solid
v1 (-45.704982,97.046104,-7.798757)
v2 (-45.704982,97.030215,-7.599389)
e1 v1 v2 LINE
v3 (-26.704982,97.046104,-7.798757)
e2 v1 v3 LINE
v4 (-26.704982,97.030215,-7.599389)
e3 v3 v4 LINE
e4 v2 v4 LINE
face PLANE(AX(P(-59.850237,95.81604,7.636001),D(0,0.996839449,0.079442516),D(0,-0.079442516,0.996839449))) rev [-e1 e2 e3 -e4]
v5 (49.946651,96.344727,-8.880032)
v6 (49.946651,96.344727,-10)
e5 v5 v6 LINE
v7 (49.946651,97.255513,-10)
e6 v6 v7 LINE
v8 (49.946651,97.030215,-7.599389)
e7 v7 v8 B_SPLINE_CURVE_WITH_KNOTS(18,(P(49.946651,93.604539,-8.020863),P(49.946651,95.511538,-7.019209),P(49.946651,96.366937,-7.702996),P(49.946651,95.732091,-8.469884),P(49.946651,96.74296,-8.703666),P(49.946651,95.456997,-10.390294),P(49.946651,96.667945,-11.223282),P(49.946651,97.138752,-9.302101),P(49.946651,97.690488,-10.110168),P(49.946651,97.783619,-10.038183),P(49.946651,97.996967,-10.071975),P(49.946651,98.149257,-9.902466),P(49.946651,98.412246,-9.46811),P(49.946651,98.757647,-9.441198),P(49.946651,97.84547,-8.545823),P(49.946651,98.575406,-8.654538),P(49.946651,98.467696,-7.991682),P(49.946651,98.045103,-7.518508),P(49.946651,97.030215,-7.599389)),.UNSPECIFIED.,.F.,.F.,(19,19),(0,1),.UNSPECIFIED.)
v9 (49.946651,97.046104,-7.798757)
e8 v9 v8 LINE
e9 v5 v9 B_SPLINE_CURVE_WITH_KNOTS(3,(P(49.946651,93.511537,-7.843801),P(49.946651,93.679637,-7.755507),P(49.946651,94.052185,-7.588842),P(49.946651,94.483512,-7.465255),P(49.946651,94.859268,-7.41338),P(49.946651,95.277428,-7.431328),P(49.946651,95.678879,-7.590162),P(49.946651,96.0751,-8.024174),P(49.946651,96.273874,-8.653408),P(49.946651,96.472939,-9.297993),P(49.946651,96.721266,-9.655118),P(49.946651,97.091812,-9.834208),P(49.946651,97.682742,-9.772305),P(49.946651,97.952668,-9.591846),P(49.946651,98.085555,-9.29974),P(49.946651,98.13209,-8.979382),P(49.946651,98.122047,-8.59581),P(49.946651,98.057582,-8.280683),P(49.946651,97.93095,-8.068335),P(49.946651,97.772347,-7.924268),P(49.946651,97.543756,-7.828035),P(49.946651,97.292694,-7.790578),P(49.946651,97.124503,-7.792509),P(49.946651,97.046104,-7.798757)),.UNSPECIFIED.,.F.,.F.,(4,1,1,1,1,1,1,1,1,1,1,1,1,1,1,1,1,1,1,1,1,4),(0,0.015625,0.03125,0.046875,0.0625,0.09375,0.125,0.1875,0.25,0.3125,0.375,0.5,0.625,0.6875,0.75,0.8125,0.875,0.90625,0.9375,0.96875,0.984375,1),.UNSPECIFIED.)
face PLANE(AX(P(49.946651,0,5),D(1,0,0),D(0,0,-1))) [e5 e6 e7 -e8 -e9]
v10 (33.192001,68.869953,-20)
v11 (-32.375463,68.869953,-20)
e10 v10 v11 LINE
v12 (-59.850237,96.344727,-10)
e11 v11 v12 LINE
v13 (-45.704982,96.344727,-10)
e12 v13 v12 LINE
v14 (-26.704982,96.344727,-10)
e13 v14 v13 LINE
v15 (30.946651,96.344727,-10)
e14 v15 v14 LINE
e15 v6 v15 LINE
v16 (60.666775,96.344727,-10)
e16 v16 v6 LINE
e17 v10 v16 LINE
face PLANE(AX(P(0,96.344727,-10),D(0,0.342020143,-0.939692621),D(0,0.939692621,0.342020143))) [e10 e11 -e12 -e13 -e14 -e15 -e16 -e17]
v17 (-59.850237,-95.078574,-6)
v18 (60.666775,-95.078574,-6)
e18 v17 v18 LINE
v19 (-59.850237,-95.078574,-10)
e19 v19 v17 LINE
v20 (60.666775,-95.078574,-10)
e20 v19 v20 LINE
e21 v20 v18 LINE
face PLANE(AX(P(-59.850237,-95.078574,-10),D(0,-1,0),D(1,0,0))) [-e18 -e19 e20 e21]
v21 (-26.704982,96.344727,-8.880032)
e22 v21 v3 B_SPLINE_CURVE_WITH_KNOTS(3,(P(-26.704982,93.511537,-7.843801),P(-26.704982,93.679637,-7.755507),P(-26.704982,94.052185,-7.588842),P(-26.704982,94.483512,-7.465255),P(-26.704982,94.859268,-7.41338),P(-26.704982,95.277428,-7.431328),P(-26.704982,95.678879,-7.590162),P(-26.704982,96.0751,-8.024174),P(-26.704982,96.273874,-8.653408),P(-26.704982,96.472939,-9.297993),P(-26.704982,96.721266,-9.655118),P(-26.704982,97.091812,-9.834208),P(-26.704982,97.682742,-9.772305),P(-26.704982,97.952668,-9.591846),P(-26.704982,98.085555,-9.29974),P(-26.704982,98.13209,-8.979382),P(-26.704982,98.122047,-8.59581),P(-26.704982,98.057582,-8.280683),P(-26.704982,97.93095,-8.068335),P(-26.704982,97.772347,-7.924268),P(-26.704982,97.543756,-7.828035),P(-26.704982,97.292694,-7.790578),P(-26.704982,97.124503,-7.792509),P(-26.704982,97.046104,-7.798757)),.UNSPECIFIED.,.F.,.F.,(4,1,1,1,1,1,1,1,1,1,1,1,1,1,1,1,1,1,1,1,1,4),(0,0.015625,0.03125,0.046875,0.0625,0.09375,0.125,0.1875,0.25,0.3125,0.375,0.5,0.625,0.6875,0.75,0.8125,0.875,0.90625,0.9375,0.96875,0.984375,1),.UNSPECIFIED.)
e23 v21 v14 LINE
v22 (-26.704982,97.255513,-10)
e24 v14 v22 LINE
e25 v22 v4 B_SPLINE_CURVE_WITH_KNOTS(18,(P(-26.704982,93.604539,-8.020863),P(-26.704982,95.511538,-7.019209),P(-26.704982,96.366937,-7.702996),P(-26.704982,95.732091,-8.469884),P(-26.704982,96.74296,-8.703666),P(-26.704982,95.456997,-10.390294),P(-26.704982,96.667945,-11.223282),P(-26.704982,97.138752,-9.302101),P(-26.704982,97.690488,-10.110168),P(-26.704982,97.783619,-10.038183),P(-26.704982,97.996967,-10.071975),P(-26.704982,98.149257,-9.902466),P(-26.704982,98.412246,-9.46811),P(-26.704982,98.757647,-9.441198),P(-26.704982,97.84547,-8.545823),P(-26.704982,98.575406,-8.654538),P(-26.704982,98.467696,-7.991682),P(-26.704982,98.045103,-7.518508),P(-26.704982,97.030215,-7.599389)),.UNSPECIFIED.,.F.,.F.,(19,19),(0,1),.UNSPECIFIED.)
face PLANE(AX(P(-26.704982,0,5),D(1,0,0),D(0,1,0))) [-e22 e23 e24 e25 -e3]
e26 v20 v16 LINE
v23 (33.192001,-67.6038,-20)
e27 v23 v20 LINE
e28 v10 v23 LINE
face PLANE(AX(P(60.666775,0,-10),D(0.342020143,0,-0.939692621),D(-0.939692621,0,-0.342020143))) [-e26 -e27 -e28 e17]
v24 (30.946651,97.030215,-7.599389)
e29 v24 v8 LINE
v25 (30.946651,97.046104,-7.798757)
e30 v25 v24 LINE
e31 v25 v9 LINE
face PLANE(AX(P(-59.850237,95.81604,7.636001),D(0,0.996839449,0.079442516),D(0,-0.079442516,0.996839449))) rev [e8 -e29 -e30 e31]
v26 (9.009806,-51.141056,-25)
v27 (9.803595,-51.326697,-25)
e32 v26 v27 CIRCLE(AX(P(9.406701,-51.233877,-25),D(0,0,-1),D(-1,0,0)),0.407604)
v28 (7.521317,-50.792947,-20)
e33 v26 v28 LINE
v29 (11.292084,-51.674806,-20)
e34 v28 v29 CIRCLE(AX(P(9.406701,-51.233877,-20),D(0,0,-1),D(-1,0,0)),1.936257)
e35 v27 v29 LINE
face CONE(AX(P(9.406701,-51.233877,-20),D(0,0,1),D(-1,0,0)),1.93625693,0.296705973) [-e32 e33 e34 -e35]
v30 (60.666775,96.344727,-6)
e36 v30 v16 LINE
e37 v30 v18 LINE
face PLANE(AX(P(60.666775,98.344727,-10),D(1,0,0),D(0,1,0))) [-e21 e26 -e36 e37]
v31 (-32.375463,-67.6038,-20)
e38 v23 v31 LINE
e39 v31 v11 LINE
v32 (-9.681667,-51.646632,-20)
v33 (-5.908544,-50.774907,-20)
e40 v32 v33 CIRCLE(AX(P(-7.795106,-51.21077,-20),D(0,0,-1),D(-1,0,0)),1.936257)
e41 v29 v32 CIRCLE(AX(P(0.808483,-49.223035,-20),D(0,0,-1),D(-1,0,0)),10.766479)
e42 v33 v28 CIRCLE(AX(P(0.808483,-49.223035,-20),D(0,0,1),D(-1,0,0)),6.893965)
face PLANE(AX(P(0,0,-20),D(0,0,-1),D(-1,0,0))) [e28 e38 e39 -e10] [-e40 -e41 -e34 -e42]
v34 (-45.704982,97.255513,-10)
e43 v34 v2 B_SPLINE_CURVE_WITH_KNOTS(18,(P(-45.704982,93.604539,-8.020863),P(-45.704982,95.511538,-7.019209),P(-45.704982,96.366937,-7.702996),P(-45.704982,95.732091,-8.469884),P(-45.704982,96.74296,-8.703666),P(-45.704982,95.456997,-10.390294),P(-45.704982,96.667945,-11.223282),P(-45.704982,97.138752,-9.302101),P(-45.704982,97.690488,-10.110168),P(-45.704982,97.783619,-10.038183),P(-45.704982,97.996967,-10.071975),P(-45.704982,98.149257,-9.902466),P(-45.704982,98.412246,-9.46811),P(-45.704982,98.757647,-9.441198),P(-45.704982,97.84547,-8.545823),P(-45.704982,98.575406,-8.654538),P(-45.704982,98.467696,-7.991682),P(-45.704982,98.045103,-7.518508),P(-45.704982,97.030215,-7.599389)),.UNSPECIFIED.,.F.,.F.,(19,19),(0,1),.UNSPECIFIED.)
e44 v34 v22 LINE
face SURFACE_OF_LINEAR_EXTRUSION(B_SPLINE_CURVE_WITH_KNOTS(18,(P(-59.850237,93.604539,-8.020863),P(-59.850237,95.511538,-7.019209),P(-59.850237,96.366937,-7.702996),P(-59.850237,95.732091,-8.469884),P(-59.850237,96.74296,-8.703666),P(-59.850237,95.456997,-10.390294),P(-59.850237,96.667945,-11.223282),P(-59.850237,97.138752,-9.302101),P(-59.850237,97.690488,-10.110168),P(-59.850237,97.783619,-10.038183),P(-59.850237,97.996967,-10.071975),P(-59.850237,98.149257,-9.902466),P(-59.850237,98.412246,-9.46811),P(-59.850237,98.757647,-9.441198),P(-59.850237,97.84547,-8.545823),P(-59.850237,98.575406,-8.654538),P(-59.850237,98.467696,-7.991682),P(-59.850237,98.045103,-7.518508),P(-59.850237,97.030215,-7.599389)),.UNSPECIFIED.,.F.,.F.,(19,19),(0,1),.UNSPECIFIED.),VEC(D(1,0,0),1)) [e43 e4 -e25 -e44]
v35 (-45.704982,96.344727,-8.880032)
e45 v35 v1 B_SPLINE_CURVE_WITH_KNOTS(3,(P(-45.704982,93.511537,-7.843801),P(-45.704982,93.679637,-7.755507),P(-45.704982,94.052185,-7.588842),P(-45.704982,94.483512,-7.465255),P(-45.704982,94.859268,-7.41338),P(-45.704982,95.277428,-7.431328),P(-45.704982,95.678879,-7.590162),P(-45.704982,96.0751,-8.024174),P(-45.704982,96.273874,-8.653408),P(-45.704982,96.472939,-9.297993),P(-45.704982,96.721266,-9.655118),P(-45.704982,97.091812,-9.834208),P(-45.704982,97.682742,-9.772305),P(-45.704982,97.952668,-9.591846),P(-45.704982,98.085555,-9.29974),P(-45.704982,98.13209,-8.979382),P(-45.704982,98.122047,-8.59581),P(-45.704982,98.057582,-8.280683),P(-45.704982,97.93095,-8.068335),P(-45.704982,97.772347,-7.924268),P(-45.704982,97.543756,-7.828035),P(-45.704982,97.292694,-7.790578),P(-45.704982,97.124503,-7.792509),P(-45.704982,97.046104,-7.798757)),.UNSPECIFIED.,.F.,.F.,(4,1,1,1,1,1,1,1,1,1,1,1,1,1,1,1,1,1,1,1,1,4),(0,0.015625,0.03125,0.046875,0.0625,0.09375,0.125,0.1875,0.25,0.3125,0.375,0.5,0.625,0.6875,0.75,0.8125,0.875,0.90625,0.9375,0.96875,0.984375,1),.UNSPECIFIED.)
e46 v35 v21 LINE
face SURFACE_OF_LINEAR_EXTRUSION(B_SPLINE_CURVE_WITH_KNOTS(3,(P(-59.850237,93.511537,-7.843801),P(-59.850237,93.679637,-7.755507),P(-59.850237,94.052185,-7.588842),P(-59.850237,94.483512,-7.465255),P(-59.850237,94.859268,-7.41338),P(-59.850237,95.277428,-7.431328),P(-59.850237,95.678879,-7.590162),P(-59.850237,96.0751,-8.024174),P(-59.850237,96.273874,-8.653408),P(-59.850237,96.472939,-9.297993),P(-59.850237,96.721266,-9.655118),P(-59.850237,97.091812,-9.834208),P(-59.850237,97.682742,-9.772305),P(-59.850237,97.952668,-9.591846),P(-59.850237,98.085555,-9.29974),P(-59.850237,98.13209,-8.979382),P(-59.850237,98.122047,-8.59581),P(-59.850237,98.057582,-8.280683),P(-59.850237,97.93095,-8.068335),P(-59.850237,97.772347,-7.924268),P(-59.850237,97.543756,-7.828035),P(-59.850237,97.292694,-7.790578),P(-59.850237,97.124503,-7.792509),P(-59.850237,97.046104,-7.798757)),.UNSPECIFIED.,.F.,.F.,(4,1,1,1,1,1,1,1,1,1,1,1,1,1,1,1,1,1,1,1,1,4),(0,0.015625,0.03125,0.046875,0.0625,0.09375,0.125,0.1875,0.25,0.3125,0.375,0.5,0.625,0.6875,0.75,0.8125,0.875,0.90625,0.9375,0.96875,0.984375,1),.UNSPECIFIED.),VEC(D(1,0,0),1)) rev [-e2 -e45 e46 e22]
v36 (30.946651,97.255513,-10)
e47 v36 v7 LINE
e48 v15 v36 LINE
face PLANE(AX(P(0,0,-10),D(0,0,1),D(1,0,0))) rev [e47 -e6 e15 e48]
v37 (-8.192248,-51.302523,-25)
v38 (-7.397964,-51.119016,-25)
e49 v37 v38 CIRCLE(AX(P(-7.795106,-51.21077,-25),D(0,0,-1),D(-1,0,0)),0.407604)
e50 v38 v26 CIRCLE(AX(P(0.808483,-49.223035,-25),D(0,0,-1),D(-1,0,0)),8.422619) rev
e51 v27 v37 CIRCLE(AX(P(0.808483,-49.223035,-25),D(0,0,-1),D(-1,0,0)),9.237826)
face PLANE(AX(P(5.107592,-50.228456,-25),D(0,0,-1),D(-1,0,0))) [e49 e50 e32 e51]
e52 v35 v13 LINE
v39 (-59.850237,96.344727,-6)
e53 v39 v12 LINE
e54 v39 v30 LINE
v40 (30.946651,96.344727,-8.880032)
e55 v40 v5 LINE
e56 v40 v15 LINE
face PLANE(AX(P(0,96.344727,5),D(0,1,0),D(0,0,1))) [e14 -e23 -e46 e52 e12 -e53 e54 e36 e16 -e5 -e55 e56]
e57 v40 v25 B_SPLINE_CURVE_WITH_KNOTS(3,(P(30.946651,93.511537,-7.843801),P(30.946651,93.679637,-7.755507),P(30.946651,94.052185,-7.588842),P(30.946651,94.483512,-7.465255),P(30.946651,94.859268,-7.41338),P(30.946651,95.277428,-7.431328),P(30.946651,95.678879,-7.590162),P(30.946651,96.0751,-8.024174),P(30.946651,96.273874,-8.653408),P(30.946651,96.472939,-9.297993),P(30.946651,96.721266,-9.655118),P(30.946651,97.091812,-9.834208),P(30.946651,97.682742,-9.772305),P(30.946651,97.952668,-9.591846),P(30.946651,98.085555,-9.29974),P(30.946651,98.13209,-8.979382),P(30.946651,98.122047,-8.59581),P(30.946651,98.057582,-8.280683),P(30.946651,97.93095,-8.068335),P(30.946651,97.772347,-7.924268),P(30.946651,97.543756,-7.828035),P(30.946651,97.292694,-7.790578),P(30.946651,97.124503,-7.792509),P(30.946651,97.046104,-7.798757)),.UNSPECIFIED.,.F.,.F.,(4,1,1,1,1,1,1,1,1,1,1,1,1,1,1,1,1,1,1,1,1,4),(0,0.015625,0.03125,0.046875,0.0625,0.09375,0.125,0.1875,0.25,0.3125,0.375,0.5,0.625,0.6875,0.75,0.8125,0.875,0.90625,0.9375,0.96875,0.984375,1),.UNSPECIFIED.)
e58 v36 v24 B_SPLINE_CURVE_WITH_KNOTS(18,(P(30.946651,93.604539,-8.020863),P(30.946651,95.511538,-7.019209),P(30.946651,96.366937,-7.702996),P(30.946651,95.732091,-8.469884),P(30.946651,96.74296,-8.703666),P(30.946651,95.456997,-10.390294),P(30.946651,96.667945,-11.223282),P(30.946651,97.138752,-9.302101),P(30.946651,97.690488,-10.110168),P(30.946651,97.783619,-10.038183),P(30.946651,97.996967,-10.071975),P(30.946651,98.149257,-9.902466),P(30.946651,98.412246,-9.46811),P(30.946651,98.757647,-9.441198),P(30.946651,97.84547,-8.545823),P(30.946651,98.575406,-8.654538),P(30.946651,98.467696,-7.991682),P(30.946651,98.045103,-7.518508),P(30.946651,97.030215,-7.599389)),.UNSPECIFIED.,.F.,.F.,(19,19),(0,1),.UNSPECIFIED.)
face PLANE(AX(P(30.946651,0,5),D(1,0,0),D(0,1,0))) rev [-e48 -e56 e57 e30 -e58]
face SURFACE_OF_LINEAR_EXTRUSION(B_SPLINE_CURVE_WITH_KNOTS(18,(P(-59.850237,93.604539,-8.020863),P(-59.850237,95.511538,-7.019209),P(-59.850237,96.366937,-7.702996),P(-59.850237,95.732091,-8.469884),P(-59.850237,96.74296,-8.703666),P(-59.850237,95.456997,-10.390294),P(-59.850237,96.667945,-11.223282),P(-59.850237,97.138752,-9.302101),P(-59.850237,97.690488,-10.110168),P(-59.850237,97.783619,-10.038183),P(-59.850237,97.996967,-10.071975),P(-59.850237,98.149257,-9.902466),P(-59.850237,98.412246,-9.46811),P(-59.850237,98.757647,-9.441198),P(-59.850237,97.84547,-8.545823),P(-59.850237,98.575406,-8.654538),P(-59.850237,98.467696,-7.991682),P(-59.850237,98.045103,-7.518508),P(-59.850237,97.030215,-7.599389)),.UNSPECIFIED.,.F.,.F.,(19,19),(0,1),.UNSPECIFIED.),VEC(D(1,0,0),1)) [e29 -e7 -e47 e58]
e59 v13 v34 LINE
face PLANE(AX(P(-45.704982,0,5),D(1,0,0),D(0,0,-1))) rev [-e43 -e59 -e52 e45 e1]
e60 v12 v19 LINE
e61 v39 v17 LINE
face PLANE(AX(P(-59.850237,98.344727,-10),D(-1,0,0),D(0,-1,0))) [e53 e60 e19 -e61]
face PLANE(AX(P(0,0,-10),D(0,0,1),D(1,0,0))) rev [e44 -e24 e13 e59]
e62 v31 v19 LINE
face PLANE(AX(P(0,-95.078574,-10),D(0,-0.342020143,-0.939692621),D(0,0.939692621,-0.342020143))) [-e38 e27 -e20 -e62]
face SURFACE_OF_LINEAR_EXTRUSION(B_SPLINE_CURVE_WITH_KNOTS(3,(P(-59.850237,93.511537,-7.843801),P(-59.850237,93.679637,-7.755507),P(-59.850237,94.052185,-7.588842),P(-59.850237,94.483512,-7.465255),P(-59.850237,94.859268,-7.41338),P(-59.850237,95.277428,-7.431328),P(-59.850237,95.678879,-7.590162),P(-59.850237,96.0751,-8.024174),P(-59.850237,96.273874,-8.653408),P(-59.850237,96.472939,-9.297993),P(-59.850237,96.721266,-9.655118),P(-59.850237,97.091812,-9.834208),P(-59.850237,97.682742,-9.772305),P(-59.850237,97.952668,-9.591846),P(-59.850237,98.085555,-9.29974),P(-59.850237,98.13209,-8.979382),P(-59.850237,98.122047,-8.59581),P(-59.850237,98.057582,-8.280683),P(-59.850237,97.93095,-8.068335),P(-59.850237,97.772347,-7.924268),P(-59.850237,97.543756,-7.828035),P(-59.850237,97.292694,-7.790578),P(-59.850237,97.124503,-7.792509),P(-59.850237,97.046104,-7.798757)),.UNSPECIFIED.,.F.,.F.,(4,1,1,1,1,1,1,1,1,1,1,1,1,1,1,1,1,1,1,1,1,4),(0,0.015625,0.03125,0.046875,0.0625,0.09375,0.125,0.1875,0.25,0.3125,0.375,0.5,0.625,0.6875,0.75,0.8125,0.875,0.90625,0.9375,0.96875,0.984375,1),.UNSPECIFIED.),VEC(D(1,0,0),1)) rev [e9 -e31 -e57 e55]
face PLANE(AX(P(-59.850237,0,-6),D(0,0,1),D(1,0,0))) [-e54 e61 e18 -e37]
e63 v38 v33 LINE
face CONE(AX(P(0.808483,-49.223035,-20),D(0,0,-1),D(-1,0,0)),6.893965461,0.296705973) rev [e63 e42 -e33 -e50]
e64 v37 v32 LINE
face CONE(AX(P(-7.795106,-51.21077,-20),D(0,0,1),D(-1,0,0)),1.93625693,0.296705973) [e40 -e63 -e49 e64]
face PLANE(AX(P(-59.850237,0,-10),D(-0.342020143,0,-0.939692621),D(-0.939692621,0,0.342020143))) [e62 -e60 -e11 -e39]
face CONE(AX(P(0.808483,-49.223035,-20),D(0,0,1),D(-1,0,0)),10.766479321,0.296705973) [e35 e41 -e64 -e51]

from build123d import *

# Parameters (mm, degrees)
BOSS_EXTRUDE2_DEPTH      = 5
BOSS_EXTRUDE2_DEPTH_BACK = 10
SKETCH1_W                = 120.517011816
SKETCH1_H                = 193.423301164
CUT_EXTRUDE1_DEPTH       = 117.520998071
CUT_EXTRUDE1_DEPTH_BACK  = 117.520998071
SKETCH2_W                = 10.720124134
SKETCH2_H                = 2
SKETCH2_W_2              = 57.651632978
SKETCH2_W_3              = 14.145254704
CUT_EXTRUDE2_START       = -95.651632978
CUT_EXTRUDE2_DEPTH       = 95.651632978
CUT_EXTRUDE4_DEPTH       = 156.859658163
CUT_EXTRUDE4_DEPTH_BACK  = 156.859658163
SKETCH5_W                = 11
SKETCH5_H                = 191.423301164
BOSS_EXTRUDE3_DEPTH      = 10
BOSS_EXTRUDE3_DRAFT      = 70
BOSS_EXTRUDE4_DEPTH      = 5
BOSS_EXTRUDE4_TAPER      = 17


# Read off the part's stored shape, not the designer's step: Cut-Extrude2
with BuildPart() as part:
    # Sketch1 → Boss-Extrude2 (new, two sides: drawn at the far end of the back side and taken through both)
    with BuildSketch(Plane.XY.offset(-BOSS_EXTRUDE2_DEPTH_BACK)):
        with Locations((0.408269184, 1.633076737)):
            Rectangle(SKETCH1_W, SKETCH1_H)
    extrude(amount=BOSS_EXTRUDE2_DEPTH + BOSS_EXTRUDE2_DEPTH_BACK)

    # Sketch2 → Cut-Extrude1 (cut, two sides: drawn at the far end of the back side and taken through both)
    with BuildSketch(Plane(origin=(0, 0, -10), x_dir=(-1, 0, 0), z_dir=(0, 0, -1)).offset(-CUT_EXTRUDE1_DEPTH_BACK)):
        with Locations((-55.306713025, 97.344727319)):
            Rectangle(SKETCH2_W, SKETCH2_H)
        with Locations((-2.120834469, 97.344727319)):
            Rectangle(SKETCH2_W_2, SKETCH2_H)
        with Locations((52.777609372, 97.344727319)):
            Rectangle(SKETCH2_W_3, SKETCH2_H)
    extrude(amount=CUT_EXTRUDE1_DEPTH + CUT_EXTRUDE1_DEPTH_BACK, mode=Mode.SUBTRACT)

    # Cut-Extrude2 outline → Cut-Extrude2 (cut)
    with BuildSketch(Plane(origin=(49.946650958, 0, 0), x_dir=(0, 0, -1), z_dir=(1, 0, 0)).offset(CUT_EXTRUDE2_START)):
        with BuildLine():
            Line((-5, 96.344727319), (8.880031812, 96.344727322))
            add(Edge.make_bspline(
                [(8.880031812, 96.344727322), (9.017757925, 96.389418818), (9.341148133, 96.502947325), (9.65511797, 96.721266154), (9.834207861, 97.091812499), (9.772304841, 97.682742311), (9.591846004, 97.952667933), (9.299739635, 98.085555426), (8.979382301, 98.13209035), (8.595809552, 98.122046866), (8.280683269, 98.057581679), (8.068335475, 97.930949515), (7.924267823, 97.772346881), (7.828035074, 97.54375556), (7.790578102, 97.292694013), (7.792508646, 97.124503178), (7.79875666, 97.046103501)],
                knots=[0.210157703, 0.210157703, 0.210157703, 0.210157703, 0.25, 0.3125, 0.375, 0.5, 0.625, 0.6875, 0.75, 0.8125, 0.875, 0.90625, 0.9375, 0.96875, 0.984375, 1, 1, 1, 1], degree=3))
            Line((7.79875666, 97.046103501), (7.599388771, 97.030214998))
            add(Edge.make_bspline(
                [(10, 97.255513039), (9.999998961, 97.447527895), (9.972419046, 97.629851143), (9.927722494, 97.794553197), (9.870710413, 97.937325839), (9.798783484, 98.058137149), (9.704435395, 98.159491912), (9.580897677, 98.243174202), (9.426924325, 98.307669655), (9.246866395, 98.348516931), (9.047009529, 98.36212633), (8.833423752, 98.351560976), (8.612813999, 98.330782958), (8.391619774, 98.318858897), (8.17208277, 98.31353746), (7.941741695, 98.247701653), (7.690138593, 98.003146143), (7.552784018, 97.615008356), (7.599388771, 97.030214998)],
                knots=[0.42378525, 0.42378525, 0.42378525, 0.42378525, 0.42378525, 0.42378525, 0.42378525, 0.42378525, 0.42378525, 0.42378525, 0.42378525, 0.42378525, 0.42378525, 0.42378525, 0.42378525, 0.42378525, 0.42378525, 0.42378525, 0.42378525, 1, 1, 1, 1, 1, 1, 1, 1, 1, 1, 1, 1, 1, 1, 1, 1, 1, 1, 1], degree=18))
            Line((10, 97.255513039), (10, 98.344727319))
            Line((10, 98.344727319), (-5, 98.344727319))
            Line((-5, 98.344727319), (-5, 96.344727319))
        make_face()
    extrude(amount=CUT_EXTRUDE2_DEPTH, mode=Mode.SUBTRACT)

    # Sketch5 → Cut-Extrude4 (cut, two sides: drawn at the far end of the back side and taken through both)
    with BuildSketch(Plane(origin=(60.666775092, 0, 0), x_dir=(0, 0, -1), z_dir=(1, 0, 0)).offset(-CUT_EXTRUDE4_DEPTH_BACK)):
        with Locations((0.5, 0.633076737)):
            Rectangle(SKETCH5_W, SKETCH5_H)
    extrude(amount=CUT_EXTRUDE4_DEPTH + CUT_EXTRUDE4_DEPTH_BACK, mode=Mode.SUBTRACT)


with BuildPart() as boss_extrude3_tool:
    # Sketch6 → Boss-Extrude3 (with draft: the straight prism first)
    with BuildSketch(Plane(origin=(0, 0, -10), x_dir=(-1, 0, 0), z_dir=(0, 0, -1))):
        Polygon((-49.946650958, 96.344727319), (-60.666775092, 96.344727319), (-60.666775092, -95.078573845), (59.850236724, -95.078573845), (59.850236724, 96.344727319), (45.70498202, 96.344727319), (26.70498202, 96.344727319), (-30.946650958, 96.344727319), align=None)
    extrude(amount=BOSS_EXTRUDE3_DEPTH)
    # Boss-Extrude3: the draft: its side faces are tilted about the plane it starts from
    boss_extrude3_sides = [boss_extrude3_tool.faces().sort_by_distance(p)[0] for p in [
        (0.408269184, 96.344727319, -15),
        (60.666775092, 0.633076737, -15),
        (0.408269184, -95.078573845, -15),
        (-59.850236724, 0.633076737, -15),
    ]]
    draft(boss_extrude3_sides, Plane(origin=(0, 0, -10), x_dir=(-1, 0, 0), z_dir=(0, 0, -1)), BOSS_EXTRUDE3_DRAFT)


with BuildPart() as part_1:
    add(part.part)

    # Boss-Extrude3: add boss_extrude3_tool
    add(boss_extrude3_tool.part)

    # Sketch7 → Boss-Extrude4 (add)
    with BuildSketch(Plane(origin=(0, 0, -20), x_dir=(-1, 0, 0), z_dir=(0, 0, -1))):
        with BuildLine():
            ThreePointArc((-11.292084394, -51.674806102), (-0.79402055, -59.989504928), (9.681667321, -51.646632242))
            ThreePointArc((9.681667321, -51.646632242), (8.230968391, -49.324207989), (5.908544137, -50.774906919))
            ThreePointArc((5.908544137, -50.774906919), (-0.79922246, -56.116994562), (-7.521316785, -50.792947135))
            ThreePointArc((-7.521316785, -50.792947135), (-9.847630073, -49.348492814), (-11.292084394, -51.674806102))
        make_face()
    extrude(amount=BOSS_EXTRUDE4_DEPTH, taper=BOSS_EXTRUDE4_TAPER)


solid = part_1.part
